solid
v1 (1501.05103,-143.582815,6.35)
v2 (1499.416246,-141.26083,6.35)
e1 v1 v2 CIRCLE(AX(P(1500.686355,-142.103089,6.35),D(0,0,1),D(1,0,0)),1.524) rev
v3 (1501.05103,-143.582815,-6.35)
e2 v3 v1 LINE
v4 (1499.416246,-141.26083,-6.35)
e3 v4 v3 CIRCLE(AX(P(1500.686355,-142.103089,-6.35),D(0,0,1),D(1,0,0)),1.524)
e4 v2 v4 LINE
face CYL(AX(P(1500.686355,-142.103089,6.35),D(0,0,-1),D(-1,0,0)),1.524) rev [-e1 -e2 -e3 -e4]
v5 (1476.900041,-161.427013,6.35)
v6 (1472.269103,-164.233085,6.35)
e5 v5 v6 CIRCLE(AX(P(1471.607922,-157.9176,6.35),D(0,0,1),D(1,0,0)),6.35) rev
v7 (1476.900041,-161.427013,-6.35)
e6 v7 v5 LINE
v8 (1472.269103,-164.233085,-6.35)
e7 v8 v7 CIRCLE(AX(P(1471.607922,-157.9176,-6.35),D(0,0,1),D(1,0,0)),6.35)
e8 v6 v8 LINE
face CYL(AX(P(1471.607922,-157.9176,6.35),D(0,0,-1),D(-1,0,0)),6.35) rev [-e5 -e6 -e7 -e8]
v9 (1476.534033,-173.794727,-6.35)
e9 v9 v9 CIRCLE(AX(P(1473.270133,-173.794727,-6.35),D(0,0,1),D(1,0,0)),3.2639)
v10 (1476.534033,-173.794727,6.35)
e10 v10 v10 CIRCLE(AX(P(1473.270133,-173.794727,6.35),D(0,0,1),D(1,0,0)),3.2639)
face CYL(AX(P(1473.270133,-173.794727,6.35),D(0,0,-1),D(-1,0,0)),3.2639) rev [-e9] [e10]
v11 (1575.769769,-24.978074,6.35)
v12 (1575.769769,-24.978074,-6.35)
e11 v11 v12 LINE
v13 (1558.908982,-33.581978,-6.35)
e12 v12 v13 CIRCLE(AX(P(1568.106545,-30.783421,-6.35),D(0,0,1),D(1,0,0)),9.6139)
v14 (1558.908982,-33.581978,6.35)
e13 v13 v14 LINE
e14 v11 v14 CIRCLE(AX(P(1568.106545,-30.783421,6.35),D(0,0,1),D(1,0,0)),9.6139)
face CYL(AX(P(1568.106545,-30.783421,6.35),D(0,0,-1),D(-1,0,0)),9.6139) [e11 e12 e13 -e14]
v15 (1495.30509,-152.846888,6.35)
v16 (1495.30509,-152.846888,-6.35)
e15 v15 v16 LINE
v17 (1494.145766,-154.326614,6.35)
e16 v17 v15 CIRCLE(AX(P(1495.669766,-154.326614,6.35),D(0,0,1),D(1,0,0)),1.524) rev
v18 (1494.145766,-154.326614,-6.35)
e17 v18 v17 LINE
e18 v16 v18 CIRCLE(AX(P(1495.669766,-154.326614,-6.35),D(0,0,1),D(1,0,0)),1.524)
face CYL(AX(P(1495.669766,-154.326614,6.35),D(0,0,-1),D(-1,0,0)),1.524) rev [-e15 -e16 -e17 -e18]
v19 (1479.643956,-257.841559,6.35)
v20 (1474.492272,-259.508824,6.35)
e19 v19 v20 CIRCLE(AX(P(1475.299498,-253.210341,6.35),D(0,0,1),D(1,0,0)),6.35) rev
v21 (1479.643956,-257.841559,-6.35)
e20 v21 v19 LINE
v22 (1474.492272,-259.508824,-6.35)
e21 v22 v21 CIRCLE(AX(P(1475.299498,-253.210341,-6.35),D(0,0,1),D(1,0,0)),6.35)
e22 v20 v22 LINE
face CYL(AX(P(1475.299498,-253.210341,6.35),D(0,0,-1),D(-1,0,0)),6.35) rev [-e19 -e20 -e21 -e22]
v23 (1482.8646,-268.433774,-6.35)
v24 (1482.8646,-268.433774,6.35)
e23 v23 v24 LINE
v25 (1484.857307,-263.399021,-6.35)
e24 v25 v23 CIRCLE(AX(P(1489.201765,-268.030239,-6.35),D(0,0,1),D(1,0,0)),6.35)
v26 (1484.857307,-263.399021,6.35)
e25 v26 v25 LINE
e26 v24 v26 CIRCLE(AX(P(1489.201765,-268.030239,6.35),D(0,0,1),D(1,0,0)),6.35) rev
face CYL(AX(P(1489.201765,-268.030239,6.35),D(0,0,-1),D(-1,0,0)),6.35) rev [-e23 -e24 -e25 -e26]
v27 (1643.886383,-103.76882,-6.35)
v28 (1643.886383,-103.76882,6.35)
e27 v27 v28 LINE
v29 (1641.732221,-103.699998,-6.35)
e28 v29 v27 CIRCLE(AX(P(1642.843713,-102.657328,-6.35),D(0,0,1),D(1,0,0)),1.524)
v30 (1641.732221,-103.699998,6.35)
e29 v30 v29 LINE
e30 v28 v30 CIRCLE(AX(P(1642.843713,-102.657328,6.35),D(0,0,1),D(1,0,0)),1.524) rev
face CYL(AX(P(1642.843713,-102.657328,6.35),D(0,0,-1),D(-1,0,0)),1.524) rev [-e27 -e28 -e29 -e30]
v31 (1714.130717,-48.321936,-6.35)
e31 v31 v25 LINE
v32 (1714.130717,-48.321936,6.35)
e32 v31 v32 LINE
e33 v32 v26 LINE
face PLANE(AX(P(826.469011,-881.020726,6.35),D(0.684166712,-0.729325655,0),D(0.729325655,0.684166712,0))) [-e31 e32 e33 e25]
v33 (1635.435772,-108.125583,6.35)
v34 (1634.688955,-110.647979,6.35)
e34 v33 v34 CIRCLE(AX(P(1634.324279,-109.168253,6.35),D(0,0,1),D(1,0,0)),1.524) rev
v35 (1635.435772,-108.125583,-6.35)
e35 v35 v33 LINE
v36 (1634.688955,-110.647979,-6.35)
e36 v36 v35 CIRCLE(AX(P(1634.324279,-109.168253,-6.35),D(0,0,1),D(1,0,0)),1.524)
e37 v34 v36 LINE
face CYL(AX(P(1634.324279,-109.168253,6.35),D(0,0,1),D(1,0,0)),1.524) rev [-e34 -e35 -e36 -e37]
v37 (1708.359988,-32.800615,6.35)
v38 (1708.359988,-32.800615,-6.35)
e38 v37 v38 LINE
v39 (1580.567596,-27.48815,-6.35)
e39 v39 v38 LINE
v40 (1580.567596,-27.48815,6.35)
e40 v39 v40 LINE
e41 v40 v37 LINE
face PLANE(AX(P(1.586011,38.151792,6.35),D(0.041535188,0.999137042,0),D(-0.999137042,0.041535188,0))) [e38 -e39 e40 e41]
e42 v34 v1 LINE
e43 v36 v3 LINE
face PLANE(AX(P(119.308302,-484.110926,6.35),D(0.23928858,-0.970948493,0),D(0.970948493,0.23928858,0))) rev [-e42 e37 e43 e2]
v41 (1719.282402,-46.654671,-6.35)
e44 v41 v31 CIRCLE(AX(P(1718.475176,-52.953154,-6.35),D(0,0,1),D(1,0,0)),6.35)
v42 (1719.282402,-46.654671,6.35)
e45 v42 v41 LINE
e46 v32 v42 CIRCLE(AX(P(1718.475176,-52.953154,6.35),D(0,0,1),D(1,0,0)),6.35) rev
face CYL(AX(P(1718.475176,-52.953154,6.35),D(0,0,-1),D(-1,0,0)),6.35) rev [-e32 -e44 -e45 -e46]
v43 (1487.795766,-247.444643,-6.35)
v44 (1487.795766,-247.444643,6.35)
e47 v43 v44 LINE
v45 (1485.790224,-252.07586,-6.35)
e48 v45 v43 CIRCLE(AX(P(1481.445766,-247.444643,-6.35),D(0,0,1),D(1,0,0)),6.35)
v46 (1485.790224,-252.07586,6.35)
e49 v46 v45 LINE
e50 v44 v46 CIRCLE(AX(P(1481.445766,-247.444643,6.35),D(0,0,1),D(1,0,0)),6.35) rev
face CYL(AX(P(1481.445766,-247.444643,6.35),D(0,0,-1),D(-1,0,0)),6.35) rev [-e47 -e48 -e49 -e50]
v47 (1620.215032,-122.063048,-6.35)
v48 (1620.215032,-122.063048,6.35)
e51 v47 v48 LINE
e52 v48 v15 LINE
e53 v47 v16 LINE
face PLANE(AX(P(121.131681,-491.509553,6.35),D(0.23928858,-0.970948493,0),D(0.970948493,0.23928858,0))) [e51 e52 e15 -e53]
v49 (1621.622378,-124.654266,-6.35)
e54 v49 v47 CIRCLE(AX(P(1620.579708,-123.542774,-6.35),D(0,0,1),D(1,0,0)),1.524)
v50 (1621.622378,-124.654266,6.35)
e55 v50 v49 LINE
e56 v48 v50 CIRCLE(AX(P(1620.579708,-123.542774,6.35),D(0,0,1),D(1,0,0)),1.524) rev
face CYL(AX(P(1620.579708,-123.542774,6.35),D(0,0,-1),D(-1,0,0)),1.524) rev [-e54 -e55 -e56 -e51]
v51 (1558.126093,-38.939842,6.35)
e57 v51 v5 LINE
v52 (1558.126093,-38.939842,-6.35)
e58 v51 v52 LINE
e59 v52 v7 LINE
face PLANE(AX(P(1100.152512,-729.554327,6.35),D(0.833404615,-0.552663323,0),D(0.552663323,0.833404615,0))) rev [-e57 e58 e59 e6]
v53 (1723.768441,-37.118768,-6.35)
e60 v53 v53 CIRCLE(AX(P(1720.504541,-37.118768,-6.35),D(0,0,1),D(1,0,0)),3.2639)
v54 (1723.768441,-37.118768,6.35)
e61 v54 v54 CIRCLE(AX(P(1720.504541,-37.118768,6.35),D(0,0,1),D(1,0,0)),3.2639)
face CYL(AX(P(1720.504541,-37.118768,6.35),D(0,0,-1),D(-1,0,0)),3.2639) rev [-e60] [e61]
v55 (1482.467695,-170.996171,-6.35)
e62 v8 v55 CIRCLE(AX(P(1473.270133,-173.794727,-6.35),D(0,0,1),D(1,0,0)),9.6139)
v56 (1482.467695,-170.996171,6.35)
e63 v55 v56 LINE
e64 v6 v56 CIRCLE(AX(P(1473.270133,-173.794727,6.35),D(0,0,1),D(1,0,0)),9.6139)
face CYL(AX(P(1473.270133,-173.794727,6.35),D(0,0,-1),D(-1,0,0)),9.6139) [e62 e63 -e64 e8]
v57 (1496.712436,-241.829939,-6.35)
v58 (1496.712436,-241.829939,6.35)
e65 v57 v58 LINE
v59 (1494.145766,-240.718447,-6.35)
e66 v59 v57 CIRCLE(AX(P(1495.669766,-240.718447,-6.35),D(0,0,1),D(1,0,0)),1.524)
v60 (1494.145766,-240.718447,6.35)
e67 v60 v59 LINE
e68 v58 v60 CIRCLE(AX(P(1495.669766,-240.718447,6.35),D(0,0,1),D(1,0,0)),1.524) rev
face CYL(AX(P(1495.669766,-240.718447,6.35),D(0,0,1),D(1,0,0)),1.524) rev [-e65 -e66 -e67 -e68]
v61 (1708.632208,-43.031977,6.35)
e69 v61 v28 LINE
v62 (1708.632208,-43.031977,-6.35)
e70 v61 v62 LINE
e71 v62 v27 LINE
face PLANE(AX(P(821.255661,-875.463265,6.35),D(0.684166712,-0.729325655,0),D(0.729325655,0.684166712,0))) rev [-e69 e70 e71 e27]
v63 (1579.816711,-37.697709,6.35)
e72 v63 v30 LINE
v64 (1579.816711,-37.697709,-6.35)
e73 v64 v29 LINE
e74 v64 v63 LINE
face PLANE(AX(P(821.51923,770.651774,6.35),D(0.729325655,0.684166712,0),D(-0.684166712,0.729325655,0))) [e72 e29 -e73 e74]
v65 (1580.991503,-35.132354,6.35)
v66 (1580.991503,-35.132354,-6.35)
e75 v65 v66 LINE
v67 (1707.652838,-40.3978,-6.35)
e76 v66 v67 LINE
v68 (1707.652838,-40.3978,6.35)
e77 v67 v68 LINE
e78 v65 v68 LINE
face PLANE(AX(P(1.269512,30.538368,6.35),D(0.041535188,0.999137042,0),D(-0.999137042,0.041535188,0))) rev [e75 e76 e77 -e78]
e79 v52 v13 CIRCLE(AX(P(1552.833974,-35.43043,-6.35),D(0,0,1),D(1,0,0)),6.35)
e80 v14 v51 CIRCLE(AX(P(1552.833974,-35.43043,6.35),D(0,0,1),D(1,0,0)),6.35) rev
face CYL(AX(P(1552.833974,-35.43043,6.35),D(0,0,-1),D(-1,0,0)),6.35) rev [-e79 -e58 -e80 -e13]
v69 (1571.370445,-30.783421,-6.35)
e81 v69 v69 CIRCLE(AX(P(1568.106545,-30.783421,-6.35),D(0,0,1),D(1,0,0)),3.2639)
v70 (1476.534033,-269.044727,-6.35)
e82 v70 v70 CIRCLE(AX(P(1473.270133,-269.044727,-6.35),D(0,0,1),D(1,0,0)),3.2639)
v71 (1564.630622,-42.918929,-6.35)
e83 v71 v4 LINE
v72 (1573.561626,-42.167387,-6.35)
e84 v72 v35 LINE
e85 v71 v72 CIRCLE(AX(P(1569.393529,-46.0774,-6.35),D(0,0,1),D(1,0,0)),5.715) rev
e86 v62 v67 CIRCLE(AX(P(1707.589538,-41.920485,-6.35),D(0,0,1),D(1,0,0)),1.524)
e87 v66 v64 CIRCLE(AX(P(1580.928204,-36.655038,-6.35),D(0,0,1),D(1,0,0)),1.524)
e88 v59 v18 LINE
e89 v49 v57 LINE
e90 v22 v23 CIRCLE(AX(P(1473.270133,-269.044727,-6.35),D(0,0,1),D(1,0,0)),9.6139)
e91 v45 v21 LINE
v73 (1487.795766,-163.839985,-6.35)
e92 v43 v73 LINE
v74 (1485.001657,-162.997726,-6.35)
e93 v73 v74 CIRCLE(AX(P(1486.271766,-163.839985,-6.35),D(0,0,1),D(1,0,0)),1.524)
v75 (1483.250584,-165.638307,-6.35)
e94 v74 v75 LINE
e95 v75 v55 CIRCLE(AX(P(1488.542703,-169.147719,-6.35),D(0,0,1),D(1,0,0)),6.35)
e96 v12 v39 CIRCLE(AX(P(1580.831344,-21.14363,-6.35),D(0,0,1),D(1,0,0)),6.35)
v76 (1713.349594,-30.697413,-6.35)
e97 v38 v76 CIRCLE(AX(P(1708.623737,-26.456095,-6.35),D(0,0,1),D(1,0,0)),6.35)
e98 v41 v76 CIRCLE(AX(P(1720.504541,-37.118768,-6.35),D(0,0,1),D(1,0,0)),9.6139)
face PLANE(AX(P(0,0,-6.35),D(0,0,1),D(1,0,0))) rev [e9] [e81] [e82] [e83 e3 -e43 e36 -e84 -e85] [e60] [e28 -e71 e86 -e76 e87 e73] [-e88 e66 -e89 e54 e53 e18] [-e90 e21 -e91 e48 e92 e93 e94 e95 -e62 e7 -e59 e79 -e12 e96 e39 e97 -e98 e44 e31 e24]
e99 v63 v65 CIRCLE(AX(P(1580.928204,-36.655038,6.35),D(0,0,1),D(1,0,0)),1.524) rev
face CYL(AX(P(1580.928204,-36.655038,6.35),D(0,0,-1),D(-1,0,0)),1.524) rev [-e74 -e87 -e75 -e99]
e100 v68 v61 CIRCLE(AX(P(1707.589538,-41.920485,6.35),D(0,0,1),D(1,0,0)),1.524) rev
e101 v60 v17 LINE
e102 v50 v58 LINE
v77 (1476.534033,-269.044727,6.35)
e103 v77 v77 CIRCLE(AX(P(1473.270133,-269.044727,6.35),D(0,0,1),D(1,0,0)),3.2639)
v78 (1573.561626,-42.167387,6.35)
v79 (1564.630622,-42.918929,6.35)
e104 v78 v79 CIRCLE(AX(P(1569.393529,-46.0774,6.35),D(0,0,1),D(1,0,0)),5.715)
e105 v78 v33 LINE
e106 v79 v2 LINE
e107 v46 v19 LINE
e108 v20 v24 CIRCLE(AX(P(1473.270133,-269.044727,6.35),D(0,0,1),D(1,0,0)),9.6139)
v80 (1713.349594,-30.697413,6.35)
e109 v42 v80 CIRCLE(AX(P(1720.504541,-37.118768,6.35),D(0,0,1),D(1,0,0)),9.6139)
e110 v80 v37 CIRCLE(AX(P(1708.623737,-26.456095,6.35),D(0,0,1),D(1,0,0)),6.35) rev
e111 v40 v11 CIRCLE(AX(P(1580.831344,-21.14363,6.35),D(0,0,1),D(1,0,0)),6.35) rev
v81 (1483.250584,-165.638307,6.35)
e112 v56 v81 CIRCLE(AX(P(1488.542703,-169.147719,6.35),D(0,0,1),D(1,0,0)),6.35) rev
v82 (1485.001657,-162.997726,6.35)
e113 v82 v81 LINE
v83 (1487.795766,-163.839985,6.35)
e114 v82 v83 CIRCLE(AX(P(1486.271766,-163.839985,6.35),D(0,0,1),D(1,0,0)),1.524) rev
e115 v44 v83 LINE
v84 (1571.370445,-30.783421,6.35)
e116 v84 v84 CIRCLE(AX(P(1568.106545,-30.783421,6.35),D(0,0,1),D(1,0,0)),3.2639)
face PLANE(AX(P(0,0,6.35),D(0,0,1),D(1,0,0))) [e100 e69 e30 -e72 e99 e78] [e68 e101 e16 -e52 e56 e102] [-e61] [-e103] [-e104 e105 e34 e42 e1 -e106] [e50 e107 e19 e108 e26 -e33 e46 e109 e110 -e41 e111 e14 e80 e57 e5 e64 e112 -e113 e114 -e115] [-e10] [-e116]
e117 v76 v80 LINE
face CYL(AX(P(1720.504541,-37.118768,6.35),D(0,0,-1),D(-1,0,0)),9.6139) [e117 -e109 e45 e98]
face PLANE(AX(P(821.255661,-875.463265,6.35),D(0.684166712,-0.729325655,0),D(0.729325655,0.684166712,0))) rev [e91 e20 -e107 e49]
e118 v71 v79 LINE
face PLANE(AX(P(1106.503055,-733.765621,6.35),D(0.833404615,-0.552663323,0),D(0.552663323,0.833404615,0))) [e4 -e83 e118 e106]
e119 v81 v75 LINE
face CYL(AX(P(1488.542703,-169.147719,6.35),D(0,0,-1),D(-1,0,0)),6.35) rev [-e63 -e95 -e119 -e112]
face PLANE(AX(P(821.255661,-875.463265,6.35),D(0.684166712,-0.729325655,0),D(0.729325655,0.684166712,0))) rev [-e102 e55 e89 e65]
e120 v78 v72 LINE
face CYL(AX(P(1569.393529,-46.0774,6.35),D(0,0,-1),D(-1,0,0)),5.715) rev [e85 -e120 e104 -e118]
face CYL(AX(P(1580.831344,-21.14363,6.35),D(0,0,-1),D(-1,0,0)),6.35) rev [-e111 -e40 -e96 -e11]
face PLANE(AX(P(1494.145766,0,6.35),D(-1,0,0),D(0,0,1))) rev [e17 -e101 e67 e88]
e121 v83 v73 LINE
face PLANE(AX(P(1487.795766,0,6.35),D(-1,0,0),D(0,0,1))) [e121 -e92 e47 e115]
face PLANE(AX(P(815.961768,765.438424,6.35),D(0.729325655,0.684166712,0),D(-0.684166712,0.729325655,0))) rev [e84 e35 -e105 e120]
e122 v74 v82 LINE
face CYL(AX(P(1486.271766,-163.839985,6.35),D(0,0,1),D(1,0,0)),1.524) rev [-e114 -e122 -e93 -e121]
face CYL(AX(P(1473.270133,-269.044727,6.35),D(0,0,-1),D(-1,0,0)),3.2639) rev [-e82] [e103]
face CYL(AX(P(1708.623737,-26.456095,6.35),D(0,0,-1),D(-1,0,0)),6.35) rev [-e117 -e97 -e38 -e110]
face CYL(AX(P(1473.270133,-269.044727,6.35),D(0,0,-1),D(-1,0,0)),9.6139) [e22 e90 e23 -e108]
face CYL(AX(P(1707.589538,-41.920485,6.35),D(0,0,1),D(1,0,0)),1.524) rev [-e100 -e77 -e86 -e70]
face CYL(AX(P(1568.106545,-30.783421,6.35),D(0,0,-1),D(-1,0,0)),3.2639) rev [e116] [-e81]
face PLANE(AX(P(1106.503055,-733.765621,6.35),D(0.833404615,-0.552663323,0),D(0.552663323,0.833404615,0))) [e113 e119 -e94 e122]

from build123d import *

# Parameters (mm, degrees)
SKETCH1_R           = 3.2639
BOSS_EXTRUDE1_DEPTH = 6.35
FILLET1_R           = 6.35
FILLET2_R           = 1.524
FILLET3_R           = 5.715


with BuildPart() as part:
    # Sketch1 → Boss-Extrude1 (new, symmetric)
    with BuildSketch(Plane.XY):
        with BuildLine():
            Line((1487.79576568, -158.784269308), (1487.79576568, -250.194499736))
            Line((1487.79576568, -250.194499736), (1477.101010284, -260.227049093))
            ThreePointArc((1477.101010284, -260.227049093), (1466.258468724, -275.622237688), (1482.314360626, -265.784510583))
            Line((1482.314360626, -265.784510583), (1716.673663322, -45.936446331))
            ThreePointArc((1716.673663322, -45.936446331), (1729.515779421, -33.768446492), (1711.843687849, -32.945436509))
            Line((1711.843687849, -32.945436509), (1577.08389596, -27.343328807))
            ThreePointArc((1577.08389596, -27.343328807), (1563.736723174, -22.220026544), (1560.05306912, -36.03400281))
            Line((1560.05306912, -36.03400281), (1474.973065059, -164.332851502))
            ThreePointArc((1474.973065059, -164.332851502), (1467.95688272, -181.806995965), (1481.323608223, -168.54414602))
            Line((1481.323608223, -168.54414602), (1487.79576568, -158.784269308))
        make_face()
        with Locations((1473.270132637, -269.04472734)):
            Circle(SKETCH1_R, mode=Mode.SUBTRACT)
        with Locations((1473.270132637, -173.79472734)):
            Circle(SKETCH1_R, mode=Mode.SUBTRACT)
        Polygon((1494.14576568, -153.132601519), (1625.870376064, -120.66929862), (1494.14576568, -244.23768389), align=None, mode=Mode.SUBTRACT)
        with BuildLine():
            Line((1571.366761462, -39.827649479), (1637.217429421, -110.024840786))
            Line((1637.217429421, -110.024840786), (1497.256271331, -144.518026652))
            Line((1497.256271331, -144.518026652), (1566.403612284, -40.245297328))
            ThreePointArc((1566.403612284, -40.245297328), (1568.912702914, -40.363462312), (1571.366761462, -39.827649479))
        make_face(mode=Mode.SUBTRACT)
        with Locations((1568.106544706, -30.78342149)):
            Circle(SKETCH1_R, mode=Mode.SUBTRACT)
        Polygon((1642.774890911, -104.811490444), (1577.264872597, -34.97743362), (1711.279538853, -40.548565657), align=None, mode=Mode.SUBTRACT)
        with Locations((1720.504540969, -37.118768084)):
            Circle(SKETCH1_R, mode=Mode.SUBTRACT)
    extrude(amount=BOSS_EXTRUDE1_DEPTH, both=True)

    # Fillet1
    fillet1_edges = [part.edges().sort_by_distance(p)[0] for p in [
        (1577.08389596, -27.343328807, 0),
        (1711.843687849, -32.945436509, 0),
        (1716.673663322, -45.936446331, 0),
        (1482.314360626, -265.784510583, 0),
        (1477.101010284, -260.227049093, 0),
        (1487.79576568, -250.194499736, 0),
        (1481.323608223, -168.54414602, 0),
        (1474.973065059, -164.332851502, 0),
        (1560.05306912, -36.03400281, 0),
    ]]
    fillet(fillet1_edges, radius=FILLET1_R)

    # Fillet2
    fillet2_edges = [part.edges().sort_by_distance(p)[0] for p in [
        (1494.14576568, -244.23768389, 0),
        (1625.870376064, -120.66929862, 0),
        (1494.14576568, -153.132601519, 0),
        (1642.774890911, -104.811490444, 0),
        (1711.279538853, -40.548565657, 0),
        (1577.264872597, -34.97743362, 0),
        (1497.256271331, -144.518026652, 0),
        (1637.217429421, -110.024840786, 0),
        (1487.79576568, -158.784269308, 0),
    ]]
    fillet(fillet2_edges, radius=FILLET2_R)

    # Fillet3
    fillet3_edges = [part.edges().sort_by_distance(p)[0] for p in [
        (1571.366761462, -39.827649479, 0),
    ]]
    fillet(fillet3_edges, radius=FILLET3_R)
    fillet3_2_edges = [part.edges().sort_by_distance(p)[0] for p in [
        (1566.403612284, -40.245297328, 0),
    ]]
    fillet(fillet3_2_edges, radius=FILLET3_R - 0.0001)  # a hair under: the kernel refuses the full size


solid = part.part
